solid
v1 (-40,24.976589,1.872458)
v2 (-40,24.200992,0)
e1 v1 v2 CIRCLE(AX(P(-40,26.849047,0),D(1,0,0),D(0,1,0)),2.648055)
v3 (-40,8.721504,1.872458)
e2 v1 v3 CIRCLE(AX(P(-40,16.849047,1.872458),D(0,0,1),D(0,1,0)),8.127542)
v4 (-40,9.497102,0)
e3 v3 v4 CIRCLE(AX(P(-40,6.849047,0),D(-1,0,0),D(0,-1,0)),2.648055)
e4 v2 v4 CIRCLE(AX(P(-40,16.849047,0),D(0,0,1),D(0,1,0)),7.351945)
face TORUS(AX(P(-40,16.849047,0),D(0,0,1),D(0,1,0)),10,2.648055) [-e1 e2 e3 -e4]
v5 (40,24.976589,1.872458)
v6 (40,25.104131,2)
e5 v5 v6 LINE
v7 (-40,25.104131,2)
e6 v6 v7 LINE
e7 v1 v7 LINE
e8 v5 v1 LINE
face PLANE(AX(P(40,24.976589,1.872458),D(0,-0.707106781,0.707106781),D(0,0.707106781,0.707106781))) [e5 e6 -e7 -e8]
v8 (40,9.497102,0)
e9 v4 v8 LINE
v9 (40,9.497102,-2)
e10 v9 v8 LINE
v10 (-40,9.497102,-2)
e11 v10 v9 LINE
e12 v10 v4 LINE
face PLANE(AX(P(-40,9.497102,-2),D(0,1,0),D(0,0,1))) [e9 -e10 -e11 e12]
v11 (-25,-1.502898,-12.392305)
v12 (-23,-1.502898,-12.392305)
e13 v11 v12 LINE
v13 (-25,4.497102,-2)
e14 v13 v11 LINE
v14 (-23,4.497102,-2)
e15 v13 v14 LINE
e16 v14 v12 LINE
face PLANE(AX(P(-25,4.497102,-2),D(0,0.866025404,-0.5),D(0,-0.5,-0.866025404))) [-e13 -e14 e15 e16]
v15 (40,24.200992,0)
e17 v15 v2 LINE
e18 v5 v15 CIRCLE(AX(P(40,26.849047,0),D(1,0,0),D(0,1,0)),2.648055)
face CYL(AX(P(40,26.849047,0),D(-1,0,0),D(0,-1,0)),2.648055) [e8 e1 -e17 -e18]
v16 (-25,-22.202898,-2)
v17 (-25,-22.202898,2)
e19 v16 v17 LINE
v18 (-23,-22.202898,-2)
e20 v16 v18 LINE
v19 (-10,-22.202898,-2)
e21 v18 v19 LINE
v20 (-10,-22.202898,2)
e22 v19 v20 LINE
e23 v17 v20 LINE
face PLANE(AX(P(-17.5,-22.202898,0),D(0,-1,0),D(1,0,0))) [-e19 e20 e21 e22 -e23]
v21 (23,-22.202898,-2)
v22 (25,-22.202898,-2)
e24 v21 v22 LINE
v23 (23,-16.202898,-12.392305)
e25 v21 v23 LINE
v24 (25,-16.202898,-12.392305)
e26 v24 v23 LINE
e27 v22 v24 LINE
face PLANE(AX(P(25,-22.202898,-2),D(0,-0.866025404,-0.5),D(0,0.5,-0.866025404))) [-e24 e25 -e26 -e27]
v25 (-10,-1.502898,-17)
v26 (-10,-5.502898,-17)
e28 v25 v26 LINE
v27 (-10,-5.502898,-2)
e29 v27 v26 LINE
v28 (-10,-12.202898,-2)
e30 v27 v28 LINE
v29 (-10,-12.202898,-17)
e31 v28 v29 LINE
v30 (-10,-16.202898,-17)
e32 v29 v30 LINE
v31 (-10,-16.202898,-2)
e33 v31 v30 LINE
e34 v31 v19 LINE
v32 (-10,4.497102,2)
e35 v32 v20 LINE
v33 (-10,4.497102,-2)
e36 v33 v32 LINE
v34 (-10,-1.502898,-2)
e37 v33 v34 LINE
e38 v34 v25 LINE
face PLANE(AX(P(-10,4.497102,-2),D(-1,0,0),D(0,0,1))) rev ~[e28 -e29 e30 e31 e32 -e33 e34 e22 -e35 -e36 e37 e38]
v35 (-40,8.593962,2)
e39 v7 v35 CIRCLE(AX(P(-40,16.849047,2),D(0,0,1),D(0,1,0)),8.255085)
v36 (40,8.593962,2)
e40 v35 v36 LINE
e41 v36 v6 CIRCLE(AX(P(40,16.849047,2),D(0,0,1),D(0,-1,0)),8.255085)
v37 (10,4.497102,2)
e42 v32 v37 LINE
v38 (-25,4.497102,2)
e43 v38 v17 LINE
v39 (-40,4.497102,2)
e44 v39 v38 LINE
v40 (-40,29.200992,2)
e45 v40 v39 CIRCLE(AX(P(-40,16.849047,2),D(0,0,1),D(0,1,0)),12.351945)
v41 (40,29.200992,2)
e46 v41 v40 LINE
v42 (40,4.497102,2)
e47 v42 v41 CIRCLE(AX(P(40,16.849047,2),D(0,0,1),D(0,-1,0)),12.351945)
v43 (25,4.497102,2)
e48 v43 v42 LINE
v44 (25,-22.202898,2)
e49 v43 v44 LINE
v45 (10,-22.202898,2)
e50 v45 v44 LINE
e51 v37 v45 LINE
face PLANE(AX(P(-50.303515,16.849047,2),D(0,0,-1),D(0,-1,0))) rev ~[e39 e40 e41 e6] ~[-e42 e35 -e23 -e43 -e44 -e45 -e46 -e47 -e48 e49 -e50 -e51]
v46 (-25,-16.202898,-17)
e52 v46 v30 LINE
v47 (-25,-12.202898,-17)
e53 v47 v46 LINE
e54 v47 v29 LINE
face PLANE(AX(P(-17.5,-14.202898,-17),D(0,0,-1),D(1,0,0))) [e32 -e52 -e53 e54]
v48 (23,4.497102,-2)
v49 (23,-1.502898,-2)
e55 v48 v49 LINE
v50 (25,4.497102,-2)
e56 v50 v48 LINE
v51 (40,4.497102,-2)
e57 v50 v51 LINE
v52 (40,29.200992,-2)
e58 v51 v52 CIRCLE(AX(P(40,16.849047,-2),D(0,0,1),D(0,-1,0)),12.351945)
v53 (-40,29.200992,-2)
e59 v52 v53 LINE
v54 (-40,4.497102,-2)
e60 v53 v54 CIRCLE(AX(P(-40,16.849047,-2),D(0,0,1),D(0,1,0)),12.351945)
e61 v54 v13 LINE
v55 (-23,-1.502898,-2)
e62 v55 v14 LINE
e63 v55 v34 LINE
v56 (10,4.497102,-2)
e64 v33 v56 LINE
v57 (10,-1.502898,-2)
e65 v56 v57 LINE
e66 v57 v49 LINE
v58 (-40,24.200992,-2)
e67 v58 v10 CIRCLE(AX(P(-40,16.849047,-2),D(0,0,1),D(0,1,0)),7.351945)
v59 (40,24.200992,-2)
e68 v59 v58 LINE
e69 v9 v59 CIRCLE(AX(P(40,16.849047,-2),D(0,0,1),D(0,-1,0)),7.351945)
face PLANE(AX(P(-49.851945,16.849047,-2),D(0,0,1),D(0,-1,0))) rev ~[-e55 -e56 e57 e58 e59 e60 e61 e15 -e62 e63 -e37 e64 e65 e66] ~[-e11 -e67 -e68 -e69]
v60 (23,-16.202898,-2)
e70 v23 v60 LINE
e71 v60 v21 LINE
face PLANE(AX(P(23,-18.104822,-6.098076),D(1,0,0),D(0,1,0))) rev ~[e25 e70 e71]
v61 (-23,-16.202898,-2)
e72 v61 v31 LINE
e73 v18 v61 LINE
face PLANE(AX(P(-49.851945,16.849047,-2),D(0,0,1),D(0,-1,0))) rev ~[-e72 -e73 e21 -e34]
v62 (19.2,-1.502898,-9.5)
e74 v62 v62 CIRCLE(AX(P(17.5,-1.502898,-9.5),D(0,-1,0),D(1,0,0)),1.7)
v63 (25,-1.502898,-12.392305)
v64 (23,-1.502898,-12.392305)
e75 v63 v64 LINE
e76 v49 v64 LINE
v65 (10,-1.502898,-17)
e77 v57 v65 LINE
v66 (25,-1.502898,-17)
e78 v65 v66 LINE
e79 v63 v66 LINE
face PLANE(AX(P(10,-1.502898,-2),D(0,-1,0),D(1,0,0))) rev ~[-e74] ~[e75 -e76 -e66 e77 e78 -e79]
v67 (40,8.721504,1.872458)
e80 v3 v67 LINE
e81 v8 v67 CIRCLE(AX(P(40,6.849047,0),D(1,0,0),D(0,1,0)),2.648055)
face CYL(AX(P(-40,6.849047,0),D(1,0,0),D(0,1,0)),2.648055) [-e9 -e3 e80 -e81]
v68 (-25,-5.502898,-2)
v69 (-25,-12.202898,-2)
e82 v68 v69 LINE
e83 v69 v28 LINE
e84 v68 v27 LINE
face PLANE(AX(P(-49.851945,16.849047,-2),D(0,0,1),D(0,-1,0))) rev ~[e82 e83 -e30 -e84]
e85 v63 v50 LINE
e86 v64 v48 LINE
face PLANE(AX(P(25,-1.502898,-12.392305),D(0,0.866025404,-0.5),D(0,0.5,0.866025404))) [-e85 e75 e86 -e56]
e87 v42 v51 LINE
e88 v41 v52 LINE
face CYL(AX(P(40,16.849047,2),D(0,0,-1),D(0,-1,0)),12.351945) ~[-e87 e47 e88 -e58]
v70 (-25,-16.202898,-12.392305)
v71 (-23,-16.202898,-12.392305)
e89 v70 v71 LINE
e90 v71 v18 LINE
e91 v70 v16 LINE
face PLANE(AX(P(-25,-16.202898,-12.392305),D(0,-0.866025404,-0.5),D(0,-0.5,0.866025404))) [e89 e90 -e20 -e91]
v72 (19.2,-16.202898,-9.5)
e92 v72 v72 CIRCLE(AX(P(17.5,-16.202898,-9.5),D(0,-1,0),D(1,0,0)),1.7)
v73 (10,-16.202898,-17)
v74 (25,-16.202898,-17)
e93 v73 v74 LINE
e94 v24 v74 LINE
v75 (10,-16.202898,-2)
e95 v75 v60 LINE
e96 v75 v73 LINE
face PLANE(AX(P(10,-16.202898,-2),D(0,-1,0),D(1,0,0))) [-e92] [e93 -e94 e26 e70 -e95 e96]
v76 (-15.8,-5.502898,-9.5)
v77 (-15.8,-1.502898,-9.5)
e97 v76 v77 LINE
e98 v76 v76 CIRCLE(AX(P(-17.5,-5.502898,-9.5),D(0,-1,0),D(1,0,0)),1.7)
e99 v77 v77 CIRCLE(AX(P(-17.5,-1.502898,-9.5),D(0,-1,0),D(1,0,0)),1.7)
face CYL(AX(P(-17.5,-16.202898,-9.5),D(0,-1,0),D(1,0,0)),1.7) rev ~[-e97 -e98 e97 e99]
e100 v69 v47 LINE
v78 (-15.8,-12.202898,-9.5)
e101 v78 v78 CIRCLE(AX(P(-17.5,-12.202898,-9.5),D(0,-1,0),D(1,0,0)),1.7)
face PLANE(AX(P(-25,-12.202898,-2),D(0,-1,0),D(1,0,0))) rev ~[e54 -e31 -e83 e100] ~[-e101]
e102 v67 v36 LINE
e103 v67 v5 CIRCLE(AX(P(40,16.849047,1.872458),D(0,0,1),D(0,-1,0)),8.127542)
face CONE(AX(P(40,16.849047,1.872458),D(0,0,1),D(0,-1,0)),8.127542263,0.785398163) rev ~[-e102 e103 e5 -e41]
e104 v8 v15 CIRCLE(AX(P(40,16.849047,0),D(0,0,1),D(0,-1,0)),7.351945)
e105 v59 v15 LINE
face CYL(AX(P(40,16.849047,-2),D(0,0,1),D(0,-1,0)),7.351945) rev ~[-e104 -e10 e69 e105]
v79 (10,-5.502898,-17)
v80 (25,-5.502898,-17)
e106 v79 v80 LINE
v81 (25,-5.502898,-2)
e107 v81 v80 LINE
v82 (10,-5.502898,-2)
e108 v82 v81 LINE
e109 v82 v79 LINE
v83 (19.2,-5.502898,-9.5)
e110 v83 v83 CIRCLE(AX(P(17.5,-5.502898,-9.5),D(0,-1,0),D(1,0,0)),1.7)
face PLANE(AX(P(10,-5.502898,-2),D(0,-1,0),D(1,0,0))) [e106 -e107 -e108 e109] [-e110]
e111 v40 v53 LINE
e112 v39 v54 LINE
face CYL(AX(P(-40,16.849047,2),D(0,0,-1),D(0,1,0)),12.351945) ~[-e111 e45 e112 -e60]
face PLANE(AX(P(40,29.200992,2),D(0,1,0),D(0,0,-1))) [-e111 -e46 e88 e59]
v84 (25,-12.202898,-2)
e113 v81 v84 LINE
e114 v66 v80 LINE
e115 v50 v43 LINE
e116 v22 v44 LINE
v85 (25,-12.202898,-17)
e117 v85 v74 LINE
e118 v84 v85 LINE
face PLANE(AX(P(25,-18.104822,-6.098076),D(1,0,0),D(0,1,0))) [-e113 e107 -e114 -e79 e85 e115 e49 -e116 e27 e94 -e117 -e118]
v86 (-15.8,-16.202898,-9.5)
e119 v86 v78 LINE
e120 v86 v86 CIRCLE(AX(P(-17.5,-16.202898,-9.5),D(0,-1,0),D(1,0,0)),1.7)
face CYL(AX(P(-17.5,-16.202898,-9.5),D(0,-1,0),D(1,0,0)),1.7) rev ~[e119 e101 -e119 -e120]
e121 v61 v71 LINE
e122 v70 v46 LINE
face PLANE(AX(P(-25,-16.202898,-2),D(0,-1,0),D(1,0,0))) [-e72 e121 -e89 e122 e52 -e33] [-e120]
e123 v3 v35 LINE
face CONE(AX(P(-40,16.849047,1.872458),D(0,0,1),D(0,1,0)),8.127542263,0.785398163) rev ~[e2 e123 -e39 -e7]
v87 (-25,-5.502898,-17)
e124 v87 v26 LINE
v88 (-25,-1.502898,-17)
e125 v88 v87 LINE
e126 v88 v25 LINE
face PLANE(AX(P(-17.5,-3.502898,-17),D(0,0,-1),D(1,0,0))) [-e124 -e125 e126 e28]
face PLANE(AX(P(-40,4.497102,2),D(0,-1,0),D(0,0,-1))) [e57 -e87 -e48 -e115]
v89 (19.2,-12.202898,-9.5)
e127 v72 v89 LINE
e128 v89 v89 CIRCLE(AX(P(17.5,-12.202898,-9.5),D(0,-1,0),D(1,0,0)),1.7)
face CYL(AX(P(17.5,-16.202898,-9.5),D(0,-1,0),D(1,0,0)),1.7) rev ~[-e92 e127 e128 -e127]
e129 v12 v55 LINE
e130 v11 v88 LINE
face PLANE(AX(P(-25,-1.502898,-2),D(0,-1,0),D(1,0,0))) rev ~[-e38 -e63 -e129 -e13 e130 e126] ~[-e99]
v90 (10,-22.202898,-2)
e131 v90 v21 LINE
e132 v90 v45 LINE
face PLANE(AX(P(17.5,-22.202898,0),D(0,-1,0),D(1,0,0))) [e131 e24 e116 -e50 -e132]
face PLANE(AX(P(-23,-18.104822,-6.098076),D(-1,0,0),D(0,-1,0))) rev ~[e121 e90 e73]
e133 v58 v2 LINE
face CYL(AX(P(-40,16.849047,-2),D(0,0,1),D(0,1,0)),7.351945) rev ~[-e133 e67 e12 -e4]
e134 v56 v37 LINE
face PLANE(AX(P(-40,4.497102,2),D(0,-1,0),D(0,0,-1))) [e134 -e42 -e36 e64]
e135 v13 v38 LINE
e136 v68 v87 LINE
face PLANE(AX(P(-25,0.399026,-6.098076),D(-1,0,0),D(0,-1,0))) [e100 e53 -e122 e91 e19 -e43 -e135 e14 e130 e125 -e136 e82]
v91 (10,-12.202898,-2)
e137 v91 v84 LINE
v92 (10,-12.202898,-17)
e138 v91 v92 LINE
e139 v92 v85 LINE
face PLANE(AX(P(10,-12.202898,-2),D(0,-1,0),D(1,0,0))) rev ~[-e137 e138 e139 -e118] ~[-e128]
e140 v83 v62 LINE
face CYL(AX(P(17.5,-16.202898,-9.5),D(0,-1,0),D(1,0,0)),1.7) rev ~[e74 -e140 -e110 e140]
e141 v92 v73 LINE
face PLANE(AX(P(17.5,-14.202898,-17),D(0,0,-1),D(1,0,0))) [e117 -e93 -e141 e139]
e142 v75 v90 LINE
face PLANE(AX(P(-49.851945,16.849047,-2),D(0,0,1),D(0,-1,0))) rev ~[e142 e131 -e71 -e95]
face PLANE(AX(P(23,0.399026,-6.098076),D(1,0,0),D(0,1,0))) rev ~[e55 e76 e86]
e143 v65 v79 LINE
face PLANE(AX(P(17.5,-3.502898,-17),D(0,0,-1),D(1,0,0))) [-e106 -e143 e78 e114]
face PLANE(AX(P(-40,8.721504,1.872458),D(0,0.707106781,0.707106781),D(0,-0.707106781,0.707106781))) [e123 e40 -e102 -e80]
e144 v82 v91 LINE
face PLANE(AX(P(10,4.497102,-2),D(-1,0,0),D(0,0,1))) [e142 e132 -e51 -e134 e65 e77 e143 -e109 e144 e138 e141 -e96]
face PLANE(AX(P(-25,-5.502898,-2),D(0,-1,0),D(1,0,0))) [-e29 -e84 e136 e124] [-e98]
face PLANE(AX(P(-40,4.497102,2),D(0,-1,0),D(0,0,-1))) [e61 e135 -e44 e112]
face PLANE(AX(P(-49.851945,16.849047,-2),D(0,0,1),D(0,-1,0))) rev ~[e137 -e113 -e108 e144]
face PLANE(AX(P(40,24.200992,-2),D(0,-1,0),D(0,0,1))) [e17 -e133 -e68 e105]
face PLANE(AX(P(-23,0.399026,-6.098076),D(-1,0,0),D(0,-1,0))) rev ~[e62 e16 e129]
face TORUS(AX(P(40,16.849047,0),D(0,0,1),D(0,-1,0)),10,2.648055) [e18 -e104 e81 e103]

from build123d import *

# Parameters (mm, degrees)
F3_W      = 15
F3_H      = 4
F4_DEPTH  = 26.7
F5_W      = 15
F5_H      = 4
F6_DEPTH  = 15
F7_R      = 1.7
F8_DEPTH  = 45.4048897462
F10_DEPTH = 2
F12_DEPTH = 2


with BuildPart() as f2:
    # F2: sweep along a path in F0
    with BuildLine(Plane.XY) as f2_path:
        ThreePointArc((-40, 26.8490467115), (-50, 16.8490467115), (-40, 6.8490467115))
        Line((-40, 6.8490467115), (40, 6.8490467115))
        ThreePointArc((40, 6.8490467115), (50, 16.8490467115), (40, 26.8490467115))
        Line((40, 26.8490467115), (-40, 26.8490467115))
    # F1 (on Right) → F2 (sweep)
    with BuildSketch(Plane.YZ):
        with BuildLine():
            Line((4.4971018384, 2), (4.4971018384, -2))
            Line((4.4971018384, -2), (9.4971018384, -2))
            Line((9.4971018384, -2), (9.4971018384, 0))
            ThreePointArc((9.4971018384, 0), (9.2955306442, 1.013366825), (8.7215044486, 1.8724577372))
            Line((8.7215044486, 1.8724577372), (8.5939621858, 2))
            Line((8.5939621858, 2), (4.4971018384, 2))
        make_face()
    sweep(path=f2_path.line)

    # F3 (on face) → F4 (join)
    with BuildSketch(Plane.XZ.offset(-4.4971018384)):
        with Locations((-17.5, 0)):
            Rectangle(F3_W, F3_H)
        with Locations((17.5, 0)):
            Rectangle(F3_W, F3_H)
    extrude(amount=F4_DEPTH)

    # F5 (on face) → F6 (join)
    with BuildSketch(Plane(origin=(0, 0, -2), x_dir=(1, 0, 0), z_dir=(0, 0, -1))):
        with Locations((-17.5, 14.2028981616)):
            Rectangle(F5_W, F5_H)
        with Locations((-17.5, 3.5028981616)):
            Rectangle(F5_W, F5_H)
        with Locations((17.5, 14.2028981616)):
            Rectangle(F5_W, F5_H)
        with Locations((17.5, 3.5028981616)):
            Rectangle(F5_W, F5_H)
    extrude(amount=F6_DEPTH)

    # F7 (on face) → F8 (cut, through all)
    with BuildSketch(Plane.XZ.offset(16.2028981616)):
        with Locations((-17.5, -9.5)):
            Circle(F7_R)
        with Locations((17.5, -9.5)):
            Circle(F7_R)
    extrude(amount=-F8_DEPTH, mode=Mode.SUBTRACT)

    # F9 (on face) → F10 (join)
    with BuildSketch(Plane(origin=(-25, 0, 0), x_dir=(0, -1, 0), z_dir=(-1, 0, 0))):
        Polygon((1.5028981616, -12.3923048454), (1.5028981616, -2), (-4.4971018384, -2), align=None)
        Polygon((22.2028981616, -2), (16.2028981616, -2), (16.2028981616, -12.3923048454), align=None)
    extrude(amount=-F10_DEPTH)

    # F11 (on face) → F12 (join)
    with BuildSketch(Plane.YZ.offset(25)):
        Polygon((-16.2028981616, -12.3923048454), (-16.2028981616, -2), (-22.2028981616, -2), align=None)
        Polygon((-1.5028981616, -12.3923048454), (4.4971018384, -2), (-1.5028981616, -2), align=None)
    extrude(amount=-F12_DEPTH)


solid = f2.part
